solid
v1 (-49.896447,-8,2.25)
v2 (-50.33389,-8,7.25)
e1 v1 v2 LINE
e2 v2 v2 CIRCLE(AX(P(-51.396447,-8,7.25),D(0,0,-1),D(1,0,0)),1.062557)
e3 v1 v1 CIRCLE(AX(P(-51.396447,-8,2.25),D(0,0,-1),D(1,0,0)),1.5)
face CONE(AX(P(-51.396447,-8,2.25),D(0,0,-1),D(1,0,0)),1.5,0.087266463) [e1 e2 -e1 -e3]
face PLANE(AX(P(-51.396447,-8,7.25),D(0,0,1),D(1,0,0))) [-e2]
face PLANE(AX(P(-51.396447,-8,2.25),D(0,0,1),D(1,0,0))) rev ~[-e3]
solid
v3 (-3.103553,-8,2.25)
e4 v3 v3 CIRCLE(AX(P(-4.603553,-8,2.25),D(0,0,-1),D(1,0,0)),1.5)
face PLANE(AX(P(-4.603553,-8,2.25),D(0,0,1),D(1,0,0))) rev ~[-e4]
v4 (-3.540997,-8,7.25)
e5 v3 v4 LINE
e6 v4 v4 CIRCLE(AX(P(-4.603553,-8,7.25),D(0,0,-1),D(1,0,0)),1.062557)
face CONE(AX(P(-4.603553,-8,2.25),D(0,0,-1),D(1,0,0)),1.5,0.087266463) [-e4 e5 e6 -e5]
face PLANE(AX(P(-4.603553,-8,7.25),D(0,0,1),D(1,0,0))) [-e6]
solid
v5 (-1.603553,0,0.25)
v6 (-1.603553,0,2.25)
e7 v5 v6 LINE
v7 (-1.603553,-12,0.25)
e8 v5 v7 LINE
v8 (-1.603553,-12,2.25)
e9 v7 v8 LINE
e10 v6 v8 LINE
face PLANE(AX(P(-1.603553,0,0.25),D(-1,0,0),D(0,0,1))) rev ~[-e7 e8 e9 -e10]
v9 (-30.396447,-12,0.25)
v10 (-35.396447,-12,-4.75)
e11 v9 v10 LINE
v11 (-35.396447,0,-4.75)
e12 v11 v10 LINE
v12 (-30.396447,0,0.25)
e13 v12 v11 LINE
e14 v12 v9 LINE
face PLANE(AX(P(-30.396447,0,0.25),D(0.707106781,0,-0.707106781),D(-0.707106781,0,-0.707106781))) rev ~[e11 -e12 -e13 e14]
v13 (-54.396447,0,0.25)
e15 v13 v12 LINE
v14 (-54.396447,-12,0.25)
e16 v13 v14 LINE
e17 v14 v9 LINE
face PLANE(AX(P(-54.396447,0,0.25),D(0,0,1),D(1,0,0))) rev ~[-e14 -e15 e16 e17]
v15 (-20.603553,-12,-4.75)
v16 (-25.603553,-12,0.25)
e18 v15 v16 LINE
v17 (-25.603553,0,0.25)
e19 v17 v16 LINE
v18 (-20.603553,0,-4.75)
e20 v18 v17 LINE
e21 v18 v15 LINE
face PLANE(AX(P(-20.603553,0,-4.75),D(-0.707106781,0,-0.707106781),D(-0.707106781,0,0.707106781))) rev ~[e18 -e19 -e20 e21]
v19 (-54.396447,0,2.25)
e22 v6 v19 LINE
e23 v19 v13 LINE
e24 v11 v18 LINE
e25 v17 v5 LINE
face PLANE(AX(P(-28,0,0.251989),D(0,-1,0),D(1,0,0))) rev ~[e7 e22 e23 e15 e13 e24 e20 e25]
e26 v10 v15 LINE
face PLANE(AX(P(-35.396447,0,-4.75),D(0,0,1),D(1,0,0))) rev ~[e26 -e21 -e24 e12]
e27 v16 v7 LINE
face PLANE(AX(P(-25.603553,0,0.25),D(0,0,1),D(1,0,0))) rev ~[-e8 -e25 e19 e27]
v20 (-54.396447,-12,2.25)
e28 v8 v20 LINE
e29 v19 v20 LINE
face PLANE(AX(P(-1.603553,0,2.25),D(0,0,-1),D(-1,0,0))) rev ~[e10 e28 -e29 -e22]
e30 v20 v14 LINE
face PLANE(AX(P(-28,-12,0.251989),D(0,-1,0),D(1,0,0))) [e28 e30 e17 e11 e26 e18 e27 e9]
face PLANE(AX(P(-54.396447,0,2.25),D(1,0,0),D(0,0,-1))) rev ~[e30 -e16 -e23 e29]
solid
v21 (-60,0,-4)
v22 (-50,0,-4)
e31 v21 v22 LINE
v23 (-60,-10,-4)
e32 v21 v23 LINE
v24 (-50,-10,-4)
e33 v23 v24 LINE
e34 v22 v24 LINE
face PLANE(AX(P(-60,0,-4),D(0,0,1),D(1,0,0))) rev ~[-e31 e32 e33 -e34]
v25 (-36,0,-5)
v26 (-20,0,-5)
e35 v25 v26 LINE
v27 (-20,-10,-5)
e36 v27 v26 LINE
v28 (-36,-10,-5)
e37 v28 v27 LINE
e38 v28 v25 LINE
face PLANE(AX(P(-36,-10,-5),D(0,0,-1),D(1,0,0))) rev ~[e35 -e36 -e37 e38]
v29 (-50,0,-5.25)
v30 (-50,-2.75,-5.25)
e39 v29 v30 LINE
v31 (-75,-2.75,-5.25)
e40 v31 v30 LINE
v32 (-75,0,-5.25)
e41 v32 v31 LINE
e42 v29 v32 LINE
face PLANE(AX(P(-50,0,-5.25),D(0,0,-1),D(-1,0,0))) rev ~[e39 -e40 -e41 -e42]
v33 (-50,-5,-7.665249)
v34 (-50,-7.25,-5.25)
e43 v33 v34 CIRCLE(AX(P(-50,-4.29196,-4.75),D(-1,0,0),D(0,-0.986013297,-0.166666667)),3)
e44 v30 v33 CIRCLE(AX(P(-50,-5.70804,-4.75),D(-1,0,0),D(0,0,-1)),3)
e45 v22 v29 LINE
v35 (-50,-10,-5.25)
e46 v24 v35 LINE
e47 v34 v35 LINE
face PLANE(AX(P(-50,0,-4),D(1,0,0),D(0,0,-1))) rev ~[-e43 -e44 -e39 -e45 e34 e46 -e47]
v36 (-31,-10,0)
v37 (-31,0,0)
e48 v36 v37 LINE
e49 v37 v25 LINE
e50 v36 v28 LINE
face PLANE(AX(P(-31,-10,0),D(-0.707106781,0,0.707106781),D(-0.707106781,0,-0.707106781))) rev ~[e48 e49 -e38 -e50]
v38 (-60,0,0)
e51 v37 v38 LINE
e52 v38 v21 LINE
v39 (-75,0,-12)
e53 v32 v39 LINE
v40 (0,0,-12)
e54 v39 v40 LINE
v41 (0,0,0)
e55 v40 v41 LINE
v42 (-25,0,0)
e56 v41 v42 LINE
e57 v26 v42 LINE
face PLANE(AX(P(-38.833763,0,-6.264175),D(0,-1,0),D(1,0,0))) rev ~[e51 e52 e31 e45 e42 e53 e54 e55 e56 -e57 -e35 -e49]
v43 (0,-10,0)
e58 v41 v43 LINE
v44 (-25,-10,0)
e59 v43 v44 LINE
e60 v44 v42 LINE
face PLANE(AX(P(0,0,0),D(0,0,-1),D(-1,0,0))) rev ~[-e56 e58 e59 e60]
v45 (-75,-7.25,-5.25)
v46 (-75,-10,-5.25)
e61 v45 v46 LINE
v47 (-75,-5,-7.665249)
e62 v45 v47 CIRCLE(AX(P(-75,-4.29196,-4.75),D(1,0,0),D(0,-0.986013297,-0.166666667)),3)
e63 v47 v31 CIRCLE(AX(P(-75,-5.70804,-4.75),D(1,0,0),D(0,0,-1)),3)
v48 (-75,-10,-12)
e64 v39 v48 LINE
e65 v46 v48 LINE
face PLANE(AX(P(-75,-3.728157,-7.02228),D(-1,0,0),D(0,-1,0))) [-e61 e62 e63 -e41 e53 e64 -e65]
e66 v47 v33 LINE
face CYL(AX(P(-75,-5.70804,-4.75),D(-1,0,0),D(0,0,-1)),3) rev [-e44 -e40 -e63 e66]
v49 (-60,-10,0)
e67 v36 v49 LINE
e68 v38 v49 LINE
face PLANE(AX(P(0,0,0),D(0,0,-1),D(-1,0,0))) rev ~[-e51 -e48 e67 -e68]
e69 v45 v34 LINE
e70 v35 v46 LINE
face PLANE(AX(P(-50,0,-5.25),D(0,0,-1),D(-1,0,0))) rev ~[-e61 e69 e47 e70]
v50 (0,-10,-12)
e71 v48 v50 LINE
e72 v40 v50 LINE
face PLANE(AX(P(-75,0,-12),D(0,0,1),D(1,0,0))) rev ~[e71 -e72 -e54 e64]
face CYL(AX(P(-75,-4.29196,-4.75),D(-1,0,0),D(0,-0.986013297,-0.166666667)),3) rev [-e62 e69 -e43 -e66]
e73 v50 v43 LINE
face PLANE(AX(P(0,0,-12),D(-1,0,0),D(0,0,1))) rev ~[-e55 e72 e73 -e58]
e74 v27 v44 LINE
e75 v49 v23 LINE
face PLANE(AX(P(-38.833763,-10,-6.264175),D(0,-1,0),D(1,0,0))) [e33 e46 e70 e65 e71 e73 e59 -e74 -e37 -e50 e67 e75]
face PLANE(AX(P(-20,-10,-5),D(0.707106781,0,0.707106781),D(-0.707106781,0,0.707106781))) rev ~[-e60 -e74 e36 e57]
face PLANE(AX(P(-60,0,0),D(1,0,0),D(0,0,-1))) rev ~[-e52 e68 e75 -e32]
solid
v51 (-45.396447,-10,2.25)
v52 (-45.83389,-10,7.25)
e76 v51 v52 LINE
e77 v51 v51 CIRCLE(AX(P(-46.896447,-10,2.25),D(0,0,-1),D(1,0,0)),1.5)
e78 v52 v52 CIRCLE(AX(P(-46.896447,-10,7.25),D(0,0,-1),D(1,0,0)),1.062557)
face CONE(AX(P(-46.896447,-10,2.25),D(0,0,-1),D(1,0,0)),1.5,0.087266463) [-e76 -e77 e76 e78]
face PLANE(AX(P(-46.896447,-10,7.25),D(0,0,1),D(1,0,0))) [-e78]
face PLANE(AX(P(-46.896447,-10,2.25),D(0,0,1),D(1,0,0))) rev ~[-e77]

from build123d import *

# Parameters (mm, degrees)
F1_DEPTH    = 10
F2_W        = 25
F2_H        = 4.5
F3_DEPTH    = 2.5
F6_DEPTH    = 10.001
F7_T1_DEPTH = 32.3950997289
F9_DEPTH    = 12
F10_R       = 1.5
F11_DEPTH   = 5
F11_TAPER   = 5


# Not quite as in the source:
# - a fillet or chamfer that OpenCascade refuses, or shapes differently, is made with other operations: its cross-section is extruded or revolved along the edge and cut away or added


with BuildPart() as f1:
    # F0 (on Front) → F1 (new body)
    with BuildSketch(Plane.XZ):
        Polygon((0, -12), (0, 0), (-60, 0), (-60, -4), (-50, -4), (-50, -5.25), (-75, -5.25), (-75, -12), (-70, -12), (-5, -12), align=None)
    extrude(amount=F1_DEPTH)

    # F2 (on face) → F3 (cut)
    with BuildSketch(Plane.XY.offset(-5.25)):
        with Locations((-62.5, -5)):
            Rectangle(F2_W, F2_H)
    extrude(amount=-F3_DEPTH, mode=Mode.SUBTRACT)

    # F5 (on face) → F6 (cut, through all)
    with BuildSketch(Plane.XZ.offset(10)):
        Polygon((-28, 0), (-31, 0), (-36, -5), (-28, -5), (-20, -5), (-25, 0), align=None)
    extrude(amount=-F6_DEPTH, mode=Mode.SUBTRACT)

    # F7: fillet of radius 3 on 2 edges, made by hand

    # F7_s2 → F7_t1 (join)
    with BuildSketch(Plane.YZ.offset(-75)):
        with BuildLine():
            ThreePointArc((-5.7080398916, -7.75), (-3.7715482184, -7.0412878475), (-2.75, -5.25))
            Line((-2.75, -5.25), (-2.75, -7.75))
            Line((-2.75, -7.75), (-5.7080398916, -7.75))
        make_face()
        with BuildLine():
            ThreePointArc((-7.25, -5.25), (-6.2284517816, -7.0412878475), (-4.2919601084, -7.75))
            Line((-4.2919601084, -7.75), (-7.25, -7.75))
            Line((-7.25, -7.75), (-7.25, -5.25))
        make_face()
    extrude(amount=F7_T1_DEPTH)


with BuildPart() as f9:
    # F8 (on Front) → F9 (new body)
    with BuildSketch(Plane.XZ):
        Polygon((-20.6035533906, -4.75), (-25.6035533906, 0.25), (-1.6035533906, 0.25), (-1.6035533906, 2.25), (-54.3964466094, 2.25), (-54.3964466094, 0.25), (-30.3964466094, 0.25), (-35.3964466094, -4.75), align=None)
    extrude(amount=F9_DEPTH)


with BuildPart() as f11:
    # F10 (on face) → F11 (new body)
    with BuildSketch(Plane.XY.offset(2.25)):
        with Locations((-46.8964466094, -10)):
            Circle(F10_R)
    extrude(amount=F11_DEPTH, taper=F11_TAPER)


with BuildPart() as f11b:
    # F10 (on face) → F11, piece 2 (new body)
    with BuildSketch(Plane.XY.offset(2.25)):
        with Locations((-51.3964466094, -8)):
            Circle(F10_R)
    extrude(amount=F11_DEPTH, taper=F11_TAPER)


with BuildPart() as f11c:
    # F10 (on face) → F11, piece 3 (new body)
    with BuildSketch(Plane.XY.offset(2.25)):
        with Locations((-4.6035533906, -8)):
            Circle(F10_R)
    extrude(amount=F11_DEPTH, taper=F11_TAPER)


solid = Compound([f1.part, f9.part, f11.part, f11b.part, f11c.part])
